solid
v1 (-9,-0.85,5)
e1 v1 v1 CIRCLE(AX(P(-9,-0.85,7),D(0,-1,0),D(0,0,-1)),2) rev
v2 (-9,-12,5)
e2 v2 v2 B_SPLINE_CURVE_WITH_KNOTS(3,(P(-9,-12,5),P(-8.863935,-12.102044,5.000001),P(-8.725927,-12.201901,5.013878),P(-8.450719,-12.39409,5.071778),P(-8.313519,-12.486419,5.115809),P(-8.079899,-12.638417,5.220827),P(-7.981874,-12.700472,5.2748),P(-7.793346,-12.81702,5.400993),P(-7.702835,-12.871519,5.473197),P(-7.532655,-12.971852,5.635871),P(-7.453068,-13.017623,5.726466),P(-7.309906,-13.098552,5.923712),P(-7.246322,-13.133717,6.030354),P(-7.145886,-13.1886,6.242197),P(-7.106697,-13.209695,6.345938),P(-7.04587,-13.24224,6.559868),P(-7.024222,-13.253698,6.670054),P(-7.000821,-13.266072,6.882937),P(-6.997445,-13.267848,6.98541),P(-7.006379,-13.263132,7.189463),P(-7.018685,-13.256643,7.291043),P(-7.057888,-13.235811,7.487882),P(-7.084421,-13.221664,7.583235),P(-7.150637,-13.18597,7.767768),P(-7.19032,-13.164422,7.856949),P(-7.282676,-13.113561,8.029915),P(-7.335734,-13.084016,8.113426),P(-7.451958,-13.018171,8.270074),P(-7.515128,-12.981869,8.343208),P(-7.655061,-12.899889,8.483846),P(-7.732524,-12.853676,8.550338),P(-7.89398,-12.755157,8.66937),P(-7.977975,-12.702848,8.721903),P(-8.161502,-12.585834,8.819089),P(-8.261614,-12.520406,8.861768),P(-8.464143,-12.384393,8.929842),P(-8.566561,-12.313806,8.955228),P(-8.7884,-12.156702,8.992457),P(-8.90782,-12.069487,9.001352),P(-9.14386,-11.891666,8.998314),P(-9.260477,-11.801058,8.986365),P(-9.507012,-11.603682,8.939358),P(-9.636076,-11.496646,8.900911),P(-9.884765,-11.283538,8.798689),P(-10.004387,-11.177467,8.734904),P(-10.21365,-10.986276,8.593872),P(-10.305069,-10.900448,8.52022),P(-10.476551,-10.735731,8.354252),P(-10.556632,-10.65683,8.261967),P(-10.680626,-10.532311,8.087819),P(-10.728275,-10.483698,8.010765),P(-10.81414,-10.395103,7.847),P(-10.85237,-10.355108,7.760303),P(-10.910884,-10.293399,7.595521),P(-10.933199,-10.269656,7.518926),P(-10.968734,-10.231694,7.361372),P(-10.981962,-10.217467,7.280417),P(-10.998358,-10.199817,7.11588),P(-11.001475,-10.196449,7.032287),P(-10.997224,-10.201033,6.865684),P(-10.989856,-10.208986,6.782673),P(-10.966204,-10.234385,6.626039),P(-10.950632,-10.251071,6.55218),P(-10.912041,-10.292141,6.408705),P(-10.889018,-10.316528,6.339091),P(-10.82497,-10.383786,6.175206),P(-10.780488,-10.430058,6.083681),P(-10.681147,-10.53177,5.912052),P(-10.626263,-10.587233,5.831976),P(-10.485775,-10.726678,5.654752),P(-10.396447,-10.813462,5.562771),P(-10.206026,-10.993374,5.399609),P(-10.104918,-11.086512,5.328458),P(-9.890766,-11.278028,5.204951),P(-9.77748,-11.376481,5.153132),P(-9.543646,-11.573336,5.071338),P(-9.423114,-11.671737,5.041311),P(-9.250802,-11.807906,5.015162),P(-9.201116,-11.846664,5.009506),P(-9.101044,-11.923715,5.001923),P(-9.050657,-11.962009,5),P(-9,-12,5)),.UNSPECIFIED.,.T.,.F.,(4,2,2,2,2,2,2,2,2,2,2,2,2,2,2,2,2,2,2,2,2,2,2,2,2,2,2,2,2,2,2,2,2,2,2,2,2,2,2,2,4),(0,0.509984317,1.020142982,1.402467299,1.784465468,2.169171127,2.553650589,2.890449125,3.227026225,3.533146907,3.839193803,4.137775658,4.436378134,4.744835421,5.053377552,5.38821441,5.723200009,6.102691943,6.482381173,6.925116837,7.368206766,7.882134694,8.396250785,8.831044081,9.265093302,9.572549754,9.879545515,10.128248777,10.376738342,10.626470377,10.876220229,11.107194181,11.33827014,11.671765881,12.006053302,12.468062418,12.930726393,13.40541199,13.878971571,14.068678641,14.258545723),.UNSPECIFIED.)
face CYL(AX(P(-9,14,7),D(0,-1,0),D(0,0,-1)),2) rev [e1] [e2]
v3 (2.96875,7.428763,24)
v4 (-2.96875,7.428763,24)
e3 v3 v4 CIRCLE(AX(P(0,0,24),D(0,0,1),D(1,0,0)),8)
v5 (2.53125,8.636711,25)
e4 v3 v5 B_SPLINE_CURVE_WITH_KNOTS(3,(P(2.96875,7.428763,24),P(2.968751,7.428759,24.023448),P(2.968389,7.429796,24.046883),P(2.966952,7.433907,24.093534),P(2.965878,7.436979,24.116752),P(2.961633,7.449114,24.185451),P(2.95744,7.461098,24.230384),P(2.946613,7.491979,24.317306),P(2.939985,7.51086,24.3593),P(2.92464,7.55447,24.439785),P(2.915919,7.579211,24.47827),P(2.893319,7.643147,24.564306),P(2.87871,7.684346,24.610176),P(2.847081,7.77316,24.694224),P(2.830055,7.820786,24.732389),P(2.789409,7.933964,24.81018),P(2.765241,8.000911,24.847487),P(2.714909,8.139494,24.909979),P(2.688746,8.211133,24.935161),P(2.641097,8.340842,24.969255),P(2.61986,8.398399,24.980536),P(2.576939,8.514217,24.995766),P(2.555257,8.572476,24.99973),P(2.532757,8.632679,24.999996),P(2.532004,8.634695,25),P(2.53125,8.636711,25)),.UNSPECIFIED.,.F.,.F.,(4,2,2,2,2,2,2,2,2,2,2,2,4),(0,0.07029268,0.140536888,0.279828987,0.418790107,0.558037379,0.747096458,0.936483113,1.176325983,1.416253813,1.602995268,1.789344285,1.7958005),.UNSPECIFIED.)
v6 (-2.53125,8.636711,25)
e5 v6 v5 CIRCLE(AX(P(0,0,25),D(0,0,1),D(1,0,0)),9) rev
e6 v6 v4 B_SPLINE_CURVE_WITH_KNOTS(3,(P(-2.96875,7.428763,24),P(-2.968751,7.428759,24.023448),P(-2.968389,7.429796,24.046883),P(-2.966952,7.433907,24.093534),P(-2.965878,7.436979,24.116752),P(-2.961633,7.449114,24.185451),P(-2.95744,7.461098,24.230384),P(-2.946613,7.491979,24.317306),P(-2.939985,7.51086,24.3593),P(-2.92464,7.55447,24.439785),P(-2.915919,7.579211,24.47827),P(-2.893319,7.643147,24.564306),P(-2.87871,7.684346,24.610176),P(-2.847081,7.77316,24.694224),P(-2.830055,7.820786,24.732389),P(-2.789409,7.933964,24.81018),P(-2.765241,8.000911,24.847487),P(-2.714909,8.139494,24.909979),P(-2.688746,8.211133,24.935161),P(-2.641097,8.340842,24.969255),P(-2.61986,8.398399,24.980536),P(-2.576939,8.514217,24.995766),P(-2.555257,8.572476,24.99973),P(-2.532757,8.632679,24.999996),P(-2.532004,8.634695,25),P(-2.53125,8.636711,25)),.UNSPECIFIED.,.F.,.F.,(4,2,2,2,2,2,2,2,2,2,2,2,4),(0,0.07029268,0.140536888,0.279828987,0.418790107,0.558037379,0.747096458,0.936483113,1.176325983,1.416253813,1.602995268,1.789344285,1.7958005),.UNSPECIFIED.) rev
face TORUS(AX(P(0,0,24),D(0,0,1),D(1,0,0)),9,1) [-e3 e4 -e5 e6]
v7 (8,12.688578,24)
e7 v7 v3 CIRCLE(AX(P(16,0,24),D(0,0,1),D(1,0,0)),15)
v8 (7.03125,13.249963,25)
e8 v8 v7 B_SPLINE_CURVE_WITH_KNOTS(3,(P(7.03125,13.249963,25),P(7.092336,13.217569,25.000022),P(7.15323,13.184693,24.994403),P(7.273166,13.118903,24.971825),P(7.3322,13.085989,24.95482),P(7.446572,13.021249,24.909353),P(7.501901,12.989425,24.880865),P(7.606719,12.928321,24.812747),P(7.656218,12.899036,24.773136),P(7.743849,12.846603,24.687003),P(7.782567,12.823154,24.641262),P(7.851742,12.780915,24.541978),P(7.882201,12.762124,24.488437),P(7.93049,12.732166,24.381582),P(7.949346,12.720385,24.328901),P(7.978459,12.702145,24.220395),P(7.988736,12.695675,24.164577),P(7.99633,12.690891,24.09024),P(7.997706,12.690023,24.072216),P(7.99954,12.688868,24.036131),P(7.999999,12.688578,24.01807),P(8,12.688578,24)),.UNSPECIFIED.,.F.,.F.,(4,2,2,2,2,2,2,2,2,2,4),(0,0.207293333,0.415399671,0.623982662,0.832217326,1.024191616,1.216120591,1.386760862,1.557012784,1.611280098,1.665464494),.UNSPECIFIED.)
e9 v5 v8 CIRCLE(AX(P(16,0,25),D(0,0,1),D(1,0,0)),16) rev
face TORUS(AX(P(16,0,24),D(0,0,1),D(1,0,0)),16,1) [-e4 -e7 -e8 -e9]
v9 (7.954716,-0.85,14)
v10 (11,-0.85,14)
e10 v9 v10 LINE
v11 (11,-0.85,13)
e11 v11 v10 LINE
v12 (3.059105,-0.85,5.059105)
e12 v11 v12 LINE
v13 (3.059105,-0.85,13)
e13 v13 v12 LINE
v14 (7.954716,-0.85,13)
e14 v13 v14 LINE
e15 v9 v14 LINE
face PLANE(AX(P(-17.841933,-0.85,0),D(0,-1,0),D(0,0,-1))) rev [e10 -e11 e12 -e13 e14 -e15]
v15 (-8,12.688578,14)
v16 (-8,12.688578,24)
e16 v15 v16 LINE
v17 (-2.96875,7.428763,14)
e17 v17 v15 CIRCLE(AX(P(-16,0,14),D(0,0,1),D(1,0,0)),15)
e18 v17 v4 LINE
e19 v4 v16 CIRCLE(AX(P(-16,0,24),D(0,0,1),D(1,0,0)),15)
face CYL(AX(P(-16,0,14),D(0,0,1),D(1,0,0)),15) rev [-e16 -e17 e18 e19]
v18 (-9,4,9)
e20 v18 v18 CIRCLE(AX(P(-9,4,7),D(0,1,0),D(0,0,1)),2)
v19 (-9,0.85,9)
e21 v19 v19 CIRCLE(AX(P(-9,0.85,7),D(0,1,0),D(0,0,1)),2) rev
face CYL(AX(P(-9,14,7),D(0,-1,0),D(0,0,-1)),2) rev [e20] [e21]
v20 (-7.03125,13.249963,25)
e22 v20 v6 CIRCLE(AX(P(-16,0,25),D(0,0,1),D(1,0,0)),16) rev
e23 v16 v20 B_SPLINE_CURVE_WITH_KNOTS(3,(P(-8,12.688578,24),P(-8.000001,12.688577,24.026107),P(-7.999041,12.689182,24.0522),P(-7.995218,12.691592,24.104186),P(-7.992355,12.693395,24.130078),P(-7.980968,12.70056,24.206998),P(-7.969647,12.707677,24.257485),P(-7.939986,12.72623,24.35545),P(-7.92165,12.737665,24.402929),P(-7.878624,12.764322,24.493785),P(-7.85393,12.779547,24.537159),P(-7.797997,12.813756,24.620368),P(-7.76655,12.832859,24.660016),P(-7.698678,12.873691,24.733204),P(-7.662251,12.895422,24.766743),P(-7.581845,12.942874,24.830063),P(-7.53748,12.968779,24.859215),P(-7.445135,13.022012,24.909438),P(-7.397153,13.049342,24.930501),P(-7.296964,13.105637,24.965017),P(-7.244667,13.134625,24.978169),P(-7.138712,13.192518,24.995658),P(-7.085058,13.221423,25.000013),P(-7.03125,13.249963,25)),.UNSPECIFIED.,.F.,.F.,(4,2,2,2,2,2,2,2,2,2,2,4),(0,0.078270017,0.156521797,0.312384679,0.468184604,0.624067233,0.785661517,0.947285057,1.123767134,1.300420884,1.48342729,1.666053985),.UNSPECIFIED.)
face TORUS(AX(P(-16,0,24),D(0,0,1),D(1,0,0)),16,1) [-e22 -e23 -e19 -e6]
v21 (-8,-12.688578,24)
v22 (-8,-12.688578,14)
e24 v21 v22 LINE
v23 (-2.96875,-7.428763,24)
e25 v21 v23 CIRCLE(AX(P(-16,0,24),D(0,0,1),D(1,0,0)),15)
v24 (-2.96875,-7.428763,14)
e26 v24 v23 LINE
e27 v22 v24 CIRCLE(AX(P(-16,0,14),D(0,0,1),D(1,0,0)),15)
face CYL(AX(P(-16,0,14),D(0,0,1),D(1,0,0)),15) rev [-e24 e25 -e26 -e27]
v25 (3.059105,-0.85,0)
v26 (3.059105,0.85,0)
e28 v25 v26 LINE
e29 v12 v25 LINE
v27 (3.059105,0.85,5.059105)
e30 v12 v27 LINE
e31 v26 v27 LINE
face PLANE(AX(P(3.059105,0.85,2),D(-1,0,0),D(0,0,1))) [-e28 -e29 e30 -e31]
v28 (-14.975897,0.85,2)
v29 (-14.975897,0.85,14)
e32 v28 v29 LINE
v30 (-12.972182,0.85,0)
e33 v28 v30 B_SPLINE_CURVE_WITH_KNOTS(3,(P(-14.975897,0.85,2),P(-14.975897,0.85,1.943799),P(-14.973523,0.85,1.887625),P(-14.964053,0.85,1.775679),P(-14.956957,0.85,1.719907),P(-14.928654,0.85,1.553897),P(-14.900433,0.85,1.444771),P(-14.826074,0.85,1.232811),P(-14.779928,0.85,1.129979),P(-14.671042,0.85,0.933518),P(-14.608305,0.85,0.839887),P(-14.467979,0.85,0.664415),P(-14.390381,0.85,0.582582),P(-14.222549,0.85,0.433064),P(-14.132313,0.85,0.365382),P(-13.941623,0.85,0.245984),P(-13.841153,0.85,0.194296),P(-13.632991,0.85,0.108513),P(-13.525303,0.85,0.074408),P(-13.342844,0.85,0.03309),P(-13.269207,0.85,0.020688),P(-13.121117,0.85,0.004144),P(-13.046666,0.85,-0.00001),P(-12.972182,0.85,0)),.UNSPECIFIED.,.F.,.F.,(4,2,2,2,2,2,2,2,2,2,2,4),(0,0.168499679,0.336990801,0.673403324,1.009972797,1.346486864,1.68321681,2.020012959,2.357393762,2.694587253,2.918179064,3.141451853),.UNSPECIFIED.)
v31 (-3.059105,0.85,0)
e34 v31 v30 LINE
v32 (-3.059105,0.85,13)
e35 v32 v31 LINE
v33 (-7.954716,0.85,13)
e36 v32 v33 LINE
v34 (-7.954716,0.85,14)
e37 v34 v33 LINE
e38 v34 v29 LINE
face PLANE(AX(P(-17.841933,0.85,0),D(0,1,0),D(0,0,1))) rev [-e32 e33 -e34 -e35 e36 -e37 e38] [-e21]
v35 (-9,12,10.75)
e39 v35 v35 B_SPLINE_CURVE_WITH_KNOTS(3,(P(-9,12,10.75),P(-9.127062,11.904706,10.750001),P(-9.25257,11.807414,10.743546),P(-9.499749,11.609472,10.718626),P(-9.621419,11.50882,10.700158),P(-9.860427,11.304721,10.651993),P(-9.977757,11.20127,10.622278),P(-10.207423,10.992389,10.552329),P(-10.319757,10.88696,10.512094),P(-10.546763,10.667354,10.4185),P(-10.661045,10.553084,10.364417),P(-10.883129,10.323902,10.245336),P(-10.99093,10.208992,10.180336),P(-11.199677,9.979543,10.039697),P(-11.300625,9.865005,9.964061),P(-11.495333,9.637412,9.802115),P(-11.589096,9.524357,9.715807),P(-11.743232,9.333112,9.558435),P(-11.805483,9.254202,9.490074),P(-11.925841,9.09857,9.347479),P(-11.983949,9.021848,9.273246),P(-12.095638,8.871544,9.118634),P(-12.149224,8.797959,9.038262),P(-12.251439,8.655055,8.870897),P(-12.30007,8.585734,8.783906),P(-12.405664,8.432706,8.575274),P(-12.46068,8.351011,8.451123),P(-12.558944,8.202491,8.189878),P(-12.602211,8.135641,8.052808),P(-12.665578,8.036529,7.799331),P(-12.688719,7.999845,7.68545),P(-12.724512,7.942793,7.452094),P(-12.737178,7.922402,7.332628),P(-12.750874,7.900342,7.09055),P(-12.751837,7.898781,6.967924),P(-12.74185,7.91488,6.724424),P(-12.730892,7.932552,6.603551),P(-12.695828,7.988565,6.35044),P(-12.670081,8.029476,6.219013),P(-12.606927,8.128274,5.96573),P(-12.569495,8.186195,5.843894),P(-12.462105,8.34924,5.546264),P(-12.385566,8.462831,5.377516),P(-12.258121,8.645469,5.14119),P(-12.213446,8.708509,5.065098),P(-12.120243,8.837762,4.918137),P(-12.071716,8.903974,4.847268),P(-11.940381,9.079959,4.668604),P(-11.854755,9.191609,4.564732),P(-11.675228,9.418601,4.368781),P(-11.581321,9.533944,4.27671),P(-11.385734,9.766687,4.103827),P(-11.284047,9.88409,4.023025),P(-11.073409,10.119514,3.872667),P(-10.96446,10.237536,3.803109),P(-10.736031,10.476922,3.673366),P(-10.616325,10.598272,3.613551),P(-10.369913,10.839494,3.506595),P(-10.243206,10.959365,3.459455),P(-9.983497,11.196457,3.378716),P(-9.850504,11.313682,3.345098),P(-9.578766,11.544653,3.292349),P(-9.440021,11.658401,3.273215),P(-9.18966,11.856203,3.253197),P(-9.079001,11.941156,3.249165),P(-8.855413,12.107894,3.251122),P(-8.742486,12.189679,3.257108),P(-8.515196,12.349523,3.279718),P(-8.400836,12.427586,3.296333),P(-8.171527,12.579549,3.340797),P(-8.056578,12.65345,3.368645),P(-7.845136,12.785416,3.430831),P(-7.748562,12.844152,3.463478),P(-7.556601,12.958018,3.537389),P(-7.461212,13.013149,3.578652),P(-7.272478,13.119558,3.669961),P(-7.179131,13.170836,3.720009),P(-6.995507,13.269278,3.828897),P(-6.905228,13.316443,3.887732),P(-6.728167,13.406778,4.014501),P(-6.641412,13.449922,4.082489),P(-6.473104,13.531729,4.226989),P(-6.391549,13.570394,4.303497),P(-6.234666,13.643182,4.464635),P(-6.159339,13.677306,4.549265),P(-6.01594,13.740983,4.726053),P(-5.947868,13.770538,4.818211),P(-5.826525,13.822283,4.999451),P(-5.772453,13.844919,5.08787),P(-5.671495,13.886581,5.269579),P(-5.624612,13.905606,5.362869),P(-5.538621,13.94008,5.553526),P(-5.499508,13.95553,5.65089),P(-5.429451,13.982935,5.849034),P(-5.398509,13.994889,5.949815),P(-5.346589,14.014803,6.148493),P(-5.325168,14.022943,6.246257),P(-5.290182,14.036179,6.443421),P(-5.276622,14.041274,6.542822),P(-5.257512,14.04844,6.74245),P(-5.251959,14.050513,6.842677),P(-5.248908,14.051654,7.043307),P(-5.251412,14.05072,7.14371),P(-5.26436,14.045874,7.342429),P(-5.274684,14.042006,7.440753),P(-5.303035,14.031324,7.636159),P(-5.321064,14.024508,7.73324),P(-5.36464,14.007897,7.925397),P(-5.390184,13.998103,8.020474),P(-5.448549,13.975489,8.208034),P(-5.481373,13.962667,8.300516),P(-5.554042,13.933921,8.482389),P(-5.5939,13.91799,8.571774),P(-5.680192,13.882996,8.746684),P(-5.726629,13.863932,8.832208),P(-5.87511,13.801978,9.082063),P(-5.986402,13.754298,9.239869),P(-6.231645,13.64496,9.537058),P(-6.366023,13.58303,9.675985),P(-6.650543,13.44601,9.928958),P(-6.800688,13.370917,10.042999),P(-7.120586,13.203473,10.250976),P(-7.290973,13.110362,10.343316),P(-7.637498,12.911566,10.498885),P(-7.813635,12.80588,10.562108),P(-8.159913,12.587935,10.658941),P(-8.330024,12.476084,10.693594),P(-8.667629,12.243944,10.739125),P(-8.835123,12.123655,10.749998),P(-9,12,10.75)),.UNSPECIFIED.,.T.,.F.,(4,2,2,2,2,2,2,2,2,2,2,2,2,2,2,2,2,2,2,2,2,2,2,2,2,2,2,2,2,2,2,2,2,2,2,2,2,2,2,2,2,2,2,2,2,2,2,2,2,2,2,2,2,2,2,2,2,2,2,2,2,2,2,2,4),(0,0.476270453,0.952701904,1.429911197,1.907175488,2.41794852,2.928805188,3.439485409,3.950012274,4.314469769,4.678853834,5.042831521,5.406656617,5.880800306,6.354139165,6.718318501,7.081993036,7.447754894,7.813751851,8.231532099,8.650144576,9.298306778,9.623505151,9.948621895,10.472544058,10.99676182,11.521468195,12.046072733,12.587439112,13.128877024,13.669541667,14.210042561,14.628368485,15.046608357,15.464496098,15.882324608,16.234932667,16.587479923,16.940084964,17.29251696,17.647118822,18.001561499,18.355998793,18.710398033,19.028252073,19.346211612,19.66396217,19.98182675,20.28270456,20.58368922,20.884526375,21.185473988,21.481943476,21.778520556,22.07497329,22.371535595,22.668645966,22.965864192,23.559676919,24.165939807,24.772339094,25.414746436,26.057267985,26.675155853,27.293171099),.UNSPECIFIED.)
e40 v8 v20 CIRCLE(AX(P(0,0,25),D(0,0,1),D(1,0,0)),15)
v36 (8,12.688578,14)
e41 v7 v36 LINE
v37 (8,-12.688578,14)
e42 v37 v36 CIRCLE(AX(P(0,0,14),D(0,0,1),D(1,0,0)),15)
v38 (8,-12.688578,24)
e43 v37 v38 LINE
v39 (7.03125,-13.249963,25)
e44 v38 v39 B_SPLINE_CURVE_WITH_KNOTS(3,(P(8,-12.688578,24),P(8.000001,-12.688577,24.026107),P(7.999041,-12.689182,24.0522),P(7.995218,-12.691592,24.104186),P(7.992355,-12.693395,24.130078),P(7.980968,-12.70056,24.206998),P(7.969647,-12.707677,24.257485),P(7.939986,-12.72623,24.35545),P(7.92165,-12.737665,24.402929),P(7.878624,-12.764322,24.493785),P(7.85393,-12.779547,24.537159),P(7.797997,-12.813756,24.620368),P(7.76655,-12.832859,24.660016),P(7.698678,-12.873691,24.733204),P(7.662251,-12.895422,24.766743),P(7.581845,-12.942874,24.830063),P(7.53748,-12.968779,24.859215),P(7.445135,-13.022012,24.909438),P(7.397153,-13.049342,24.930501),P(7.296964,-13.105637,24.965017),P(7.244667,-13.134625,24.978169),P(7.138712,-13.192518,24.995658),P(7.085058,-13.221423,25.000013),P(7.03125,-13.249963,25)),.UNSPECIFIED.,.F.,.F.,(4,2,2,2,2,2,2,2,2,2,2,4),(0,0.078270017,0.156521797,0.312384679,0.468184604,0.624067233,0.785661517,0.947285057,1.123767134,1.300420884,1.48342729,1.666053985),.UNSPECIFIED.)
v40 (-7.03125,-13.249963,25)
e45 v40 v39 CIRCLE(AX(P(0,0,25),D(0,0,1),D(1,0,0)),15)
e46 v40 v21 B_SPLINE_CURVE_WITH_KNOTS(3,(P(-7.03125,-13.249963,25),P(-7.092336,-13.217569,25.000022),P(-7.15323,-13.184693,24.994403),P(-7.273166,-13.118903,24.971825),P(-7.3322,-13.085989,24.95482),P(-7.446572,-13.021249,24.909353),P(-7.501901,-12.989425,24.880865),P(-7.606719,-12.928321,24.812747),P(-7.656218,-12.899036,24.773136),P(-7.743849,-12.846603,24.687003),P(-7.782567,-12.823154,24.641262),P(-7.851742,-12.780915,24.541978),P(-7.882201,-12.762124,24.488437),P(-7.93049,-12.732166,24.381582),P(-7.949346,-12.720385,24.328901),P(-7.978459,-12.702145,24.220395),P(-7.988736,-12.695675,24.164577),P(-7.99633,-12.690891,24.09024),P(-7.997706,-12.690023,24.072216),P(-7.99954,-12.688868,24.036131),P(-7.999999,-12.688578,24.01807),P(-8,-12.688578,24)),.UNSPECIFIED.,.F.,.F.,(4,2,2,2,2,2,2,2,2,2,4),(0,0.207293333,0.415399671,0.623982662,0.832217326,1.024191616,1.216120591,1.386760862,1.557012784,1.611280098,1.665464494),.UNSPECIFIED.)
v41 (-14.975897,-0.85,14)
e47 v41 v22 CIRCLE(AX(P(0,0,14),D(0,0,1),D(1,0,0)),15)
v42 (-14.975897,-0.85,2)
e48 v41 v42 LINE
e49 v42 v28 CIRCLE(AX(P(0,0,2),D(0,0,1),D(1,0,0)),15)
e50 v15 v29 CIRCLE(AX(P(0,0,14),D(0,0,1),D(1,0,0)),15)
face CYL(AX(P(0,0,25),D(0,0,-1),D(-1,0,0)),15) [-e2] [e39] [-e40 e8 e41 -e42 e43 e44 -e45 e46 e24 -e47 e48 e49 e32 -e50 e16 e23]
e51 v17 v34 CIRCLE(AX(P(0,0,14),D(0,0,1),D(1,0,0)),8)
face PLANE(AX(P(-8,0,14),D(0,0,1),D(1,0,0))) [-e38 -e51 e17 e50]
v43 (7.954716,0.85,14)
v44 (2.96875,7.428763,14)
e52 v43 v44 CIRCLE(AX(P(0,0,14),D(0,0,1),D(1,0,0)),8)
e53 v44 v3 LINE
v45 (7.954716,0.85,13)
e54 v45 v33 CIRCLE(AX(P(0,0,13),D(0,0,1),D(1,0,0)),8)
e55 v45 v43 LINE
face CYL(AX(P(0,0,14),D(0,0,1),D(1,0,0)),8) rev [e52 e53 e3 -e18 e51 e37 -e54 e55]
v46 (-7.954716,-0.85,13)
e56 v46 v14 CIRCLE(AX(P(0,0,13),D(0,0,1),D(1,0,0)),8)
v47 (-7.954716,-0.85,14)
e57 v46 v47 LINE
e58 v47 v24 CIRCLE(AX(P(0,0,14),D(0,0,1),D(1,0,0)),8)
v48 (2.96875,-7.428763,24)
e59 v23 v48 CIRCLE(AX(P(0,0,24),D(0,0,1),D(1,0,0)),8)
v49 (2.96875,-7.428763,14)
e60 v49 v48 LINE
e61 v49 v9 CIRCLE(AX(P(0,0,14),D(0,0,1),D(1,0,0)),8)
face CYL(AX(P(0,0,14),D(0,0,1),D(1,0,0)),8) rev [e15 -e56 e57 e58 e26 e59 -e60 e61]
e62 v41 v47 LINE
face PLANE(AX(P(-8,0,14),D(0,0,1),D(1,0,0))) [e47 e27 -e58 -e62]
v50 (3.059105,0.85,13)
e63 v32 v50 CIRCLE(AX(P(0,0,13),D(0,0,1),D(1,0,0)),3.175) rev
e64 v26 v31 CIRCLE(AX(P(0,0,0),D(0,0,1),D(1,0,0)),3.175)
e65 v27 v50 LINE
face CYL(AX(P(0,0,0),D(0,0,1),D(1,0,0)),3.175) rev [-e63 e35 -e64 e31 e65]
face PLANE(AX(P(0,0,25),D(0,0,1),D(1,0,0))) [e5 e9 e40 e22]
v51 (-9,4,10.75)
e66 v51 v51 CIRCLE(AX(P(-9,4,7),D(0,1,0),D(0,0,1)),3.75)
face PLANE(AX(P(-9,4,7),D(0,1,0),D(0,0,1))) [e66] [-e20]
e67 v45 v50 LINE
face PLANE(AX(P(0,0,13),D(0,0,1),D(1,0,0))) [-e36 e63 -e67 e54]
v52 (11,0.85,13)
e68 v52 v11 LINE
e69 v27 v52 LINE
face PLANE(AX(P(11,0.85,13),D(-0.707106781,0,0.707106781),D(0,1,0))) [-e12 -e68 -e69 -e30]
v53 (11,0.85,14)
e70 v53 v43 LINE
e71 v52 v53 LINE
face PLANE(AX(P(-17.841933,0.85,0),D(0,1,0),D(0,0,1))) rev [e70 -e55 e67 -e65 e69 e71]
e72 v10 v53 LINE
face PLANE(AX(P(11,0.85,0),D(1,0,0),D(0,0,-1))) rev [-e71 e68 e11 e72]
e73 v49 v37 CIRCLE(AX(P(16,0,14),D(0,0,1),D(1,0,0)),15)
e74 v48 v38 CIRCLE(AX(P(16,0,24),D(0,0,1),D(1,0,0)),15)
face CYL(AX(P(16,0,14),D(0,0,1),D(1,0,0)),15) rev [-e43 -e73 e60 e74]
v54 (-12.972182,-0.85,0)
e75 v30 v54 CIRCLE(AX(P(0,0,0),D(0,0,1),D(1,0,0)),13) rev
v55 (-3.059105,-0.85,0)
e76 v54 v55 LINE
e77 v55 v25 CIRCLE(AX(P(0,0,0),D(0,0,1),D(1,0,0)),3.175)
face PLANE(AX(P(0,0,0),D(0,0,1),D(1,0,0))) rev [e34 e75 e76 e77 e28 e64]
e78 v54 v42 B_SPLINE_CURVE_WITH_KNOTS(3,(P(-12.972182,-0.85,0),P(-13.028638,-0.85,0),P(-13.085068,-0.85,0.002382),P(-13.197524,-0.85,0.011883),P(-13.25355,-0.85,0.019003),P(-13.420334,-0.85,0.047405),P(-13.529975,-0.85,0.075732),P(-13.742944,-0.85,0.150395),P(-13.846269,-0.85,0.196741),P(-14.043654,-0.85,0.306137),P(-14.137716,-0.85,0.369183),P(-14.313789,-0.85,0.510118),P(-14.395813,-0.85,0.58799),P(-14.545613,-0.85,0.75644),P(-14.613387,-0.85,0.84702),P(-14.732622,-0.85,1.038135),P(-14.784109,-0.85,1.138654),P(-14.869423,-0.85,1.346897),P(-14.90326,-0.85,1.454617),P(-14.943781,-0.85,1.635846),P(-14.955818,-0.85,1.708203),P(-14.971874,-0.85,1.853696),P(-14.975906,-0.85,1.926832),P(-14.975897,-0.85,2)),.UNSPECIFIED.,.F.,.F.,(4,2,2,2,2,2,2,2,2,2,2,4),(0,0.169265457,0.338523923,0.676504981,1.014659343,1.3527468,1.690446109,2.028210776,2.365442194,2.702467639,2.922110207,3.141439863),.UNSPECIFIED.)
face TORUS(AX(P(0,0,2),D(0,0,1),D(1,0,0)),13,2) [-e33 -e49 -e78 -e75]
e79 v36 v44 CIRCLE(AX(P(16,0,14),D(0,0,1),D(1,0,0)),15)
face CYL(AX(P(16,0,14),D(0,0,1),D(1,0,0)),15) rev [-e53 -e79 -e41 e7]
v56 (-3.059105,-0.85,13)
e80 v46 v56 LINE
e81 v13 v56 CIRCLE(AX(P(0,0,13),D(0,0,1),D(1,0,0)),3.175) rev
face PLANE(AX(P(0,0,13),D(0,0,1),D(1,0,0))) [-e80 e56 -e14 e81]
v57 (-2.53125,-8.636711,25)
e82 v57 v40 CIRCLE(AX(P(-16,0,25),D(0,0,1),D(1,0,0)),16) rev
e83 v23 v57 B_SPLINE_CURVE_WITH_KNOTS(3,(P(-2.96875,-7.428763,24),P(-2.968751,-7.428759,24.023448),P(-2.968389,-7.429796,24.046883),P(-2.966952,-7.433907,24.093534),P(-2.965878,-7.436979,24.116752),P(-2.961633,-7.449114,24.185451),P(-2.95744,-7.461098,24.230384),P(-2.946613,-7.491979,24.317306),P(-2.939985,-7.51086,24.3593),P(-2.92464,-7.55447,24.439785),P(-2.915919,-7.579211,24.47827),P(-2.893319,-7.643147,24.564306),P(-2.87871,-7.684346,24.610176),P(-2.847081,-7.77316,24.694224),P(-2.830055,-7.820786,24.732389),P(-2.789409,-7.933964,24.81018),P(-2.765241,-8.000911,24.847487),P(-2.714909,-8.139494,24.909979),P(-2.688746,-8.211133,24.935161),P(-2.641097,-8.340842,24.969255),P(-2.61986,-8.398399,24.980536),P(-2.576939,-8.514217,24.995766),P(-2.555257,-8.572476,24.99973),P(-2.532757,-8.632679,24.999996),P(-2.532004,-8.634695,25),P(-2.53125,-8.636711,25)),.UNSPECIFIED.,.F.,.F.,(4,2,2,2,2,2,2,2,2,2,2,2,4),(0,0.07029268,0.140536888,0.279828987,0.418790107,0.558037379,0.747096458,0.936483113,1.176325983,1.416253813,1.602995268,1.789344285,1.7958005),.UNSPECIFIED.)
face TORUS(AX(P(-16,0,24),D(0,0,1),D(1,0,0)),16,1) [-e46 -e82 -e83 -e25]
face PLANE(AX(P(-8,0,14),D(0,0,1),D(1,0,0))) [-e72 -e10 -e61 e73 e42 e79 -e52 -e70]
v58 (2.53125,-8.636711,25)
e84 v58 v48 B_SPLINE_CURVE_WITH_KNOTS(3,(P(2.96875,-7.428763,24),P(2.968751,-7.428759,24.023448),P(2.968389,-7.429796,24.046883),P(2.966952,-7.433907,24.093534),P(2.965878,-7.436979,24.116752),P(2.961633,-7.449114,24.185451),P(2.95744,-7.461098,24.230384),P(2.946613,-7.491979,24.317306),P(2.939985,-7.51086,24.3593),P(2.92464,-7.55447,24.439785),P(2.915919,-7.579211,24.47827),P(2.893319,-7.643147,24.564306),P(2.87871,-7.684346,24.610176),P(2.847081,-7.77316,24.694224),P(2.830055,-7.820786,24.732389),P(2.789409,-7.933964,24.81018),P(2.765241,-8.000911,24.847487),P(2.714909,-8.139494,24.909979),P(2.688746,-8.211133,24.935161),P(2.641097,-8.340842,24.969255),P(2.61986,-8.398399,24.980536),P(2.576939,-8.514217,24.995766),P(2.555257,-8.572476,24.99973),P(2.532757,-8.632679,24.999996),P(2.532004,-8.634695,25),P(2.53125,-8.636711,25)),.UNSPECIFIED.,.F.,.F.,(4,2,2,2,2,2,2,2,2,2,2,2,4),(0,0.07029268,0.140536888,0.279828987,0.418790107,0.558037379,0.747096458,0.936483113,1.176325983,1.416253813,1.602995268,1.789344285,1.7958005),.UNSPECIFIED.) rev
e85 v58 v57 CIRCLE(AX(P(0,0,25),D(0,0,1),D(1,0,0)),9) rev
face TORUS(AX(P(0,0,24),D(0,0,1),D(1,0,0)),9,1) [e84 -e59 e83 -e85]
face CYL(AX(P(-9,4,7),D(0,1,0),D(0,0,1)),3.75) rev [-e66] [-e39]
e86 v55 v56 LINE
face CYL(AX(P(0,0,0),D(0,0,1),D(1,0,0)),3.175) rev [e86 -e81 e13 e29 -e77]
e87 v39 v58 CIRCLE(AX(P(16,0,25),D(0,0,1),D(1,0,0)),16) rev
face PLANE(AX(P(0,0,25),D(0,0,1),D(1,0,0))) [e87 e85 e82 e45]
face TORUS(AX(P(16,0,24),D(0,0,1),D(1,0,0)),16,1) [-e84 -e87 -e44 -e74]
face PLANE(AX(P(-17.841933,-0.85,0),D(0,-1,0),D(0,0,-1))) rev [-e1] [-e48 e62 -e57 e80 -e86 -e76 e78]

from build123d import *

# Parameters (mm, degrees)
SKETCH1_R               = 15
BOSS_EXTRUDE1_DEPTH     = 25
CUT_EXTRUDE1_DEPTH      = 11
SKETCH4_R               = 3.175
CUT_EXTRUDE2_DEPTH      = 14
SKETCH5_R               = 8
CUT_EXTRUDE3_DEPTH      = 1
SKETCH6_W               = 28.841933153
SKETCH6_H               = 1.7
CUT_EXTRUDE4_DEPTH      = 14
SKETCH7_W               = 7.940894739
SKETCH7_H               = 1.7
BOSS_EXTRUDE2_DEPTH     = 2
CHAMFER1_SIZE           = 11
CUT_EXTRUDE5_DEPTH      = 14
CUT_EXTRUDE5_DEPTH_BACK = 14
SKETCH8_R               = 2
SKETCH9_R               = 3.75
CUT_EXTRUDE6_DEPTH      = 11
FILLET1_R               = 2
FILLET2_R               = 1


with BuildPart() as part:
    # Sketch1 → Boss-Extrude1 (new body)
    with BuildSketch(Plane.XY):
        Circle(SKETCH1_R)
    extrude(amount=BOSS_EXTRUDE1_DEPTH)

    # Sketch3 → Cut-Extrude1 (cut)
    with BuildSketch(Plane.XY.offset(25)):
        with BuildLine():
            ThreePointArc((2.96875, -7.428763251), (31, 0), (2.96875, 7.428763251))
            ThreePointArc((2.96875, 7.428763251), (0, 8), (-2.96875, 7.428763251))
            ThreePointArc((-2.96875, 7.428763251), (-31, 0), (-2.96875, -7.428763251))
            ThreePointArc((-2.96875, -7.428763251), (0, -8), (2.96875, -7.428763251))
        make_face()
    extrude(amount=-CUT_EXTRUDE1_DEPTH, mode=Mode.SUBTRACT)

    # Sketch4 → Cut-Extrude2 (cut)
    with BuildSketch(Plane.XY.offset(14)):
        Circle(SKETCH4_R)
    extrude(amount=-CUT_EXTRUDE2_DEPTH, mode=Mode.SUBTRACT)

    # Sketch5 → Cut-Extrude3 (cut)
    with BuildSketch(Plane.XY.offset(14)):
        Circle(SKETCH5_R)
    extrude(amount=-CUT_EXTRUDE3_DEPTH, mode=Mode.SUBTRACT)

    # Sketch6 → Cut-Extrude4 (cut)
    with BuildSketch(Plane.XY.offset(14)):
        with Locations((-3.420966576, 0)):
            Rectangle(SKETCH6_W, SKETCH6_H)
    extrude(amount=-CUT_EXTRUDE4_DEPTH, mode=Mode.SUBTRACT)

    # Sketch7 → Boss-Extrude2 (add)
    with BuildSketch(Plane(origin=(0, 0, 0), x_dir=(-1, 0, 0), z_dir=(0, 0, -1))):
        with Locations((-7.02955263, 0)):
            Rectangle(SKETCH7_W, SKETCH7_H)
    extrude(amount=-BOSS_EXTRUDE2_DEPTH)

    # Chamfer1
    # the kernel refuses this chamfer: 11 mm, written as the material it adds along each edge
    with BuildSketch(Plane(origin=(11, -0.85, 2), x_dir=(0.027495876610586414, 0, 0.9996219169112968), z_dir=(0, 1, 0))) as chamfer1_piece_1_section:
        Polygon((CHAMFER1_SIZE * 0.999621916911, -CHAMFER1_SIZE * 0.0274958766106), (-CHAMFER1_SIZE * 0.0274958766106, -CHAMFER1_SIZE * 0.999621916911), (0, 0), align=None)
    chamfer1_piece_1 = extrude(amount=1.7, mode=Mode.PRIVATE)
    chamfer1_piece_1 = split(chamfer1_piece_1, bisect_by=Plane(origin=(3.059105261, 0, 5.913893193), z_dir=(1, 0, 0)), keep=Keep.TOP, mode=Mode.PRIVATE)
    add(chamfer1_piece_1)

    # Sketch8 → Cut-Extrude5 (cut, two sides: drawn at the far end of the back side and taken through both)
    with BuildSketch(Plane(origin=(0, 0, 0), x_dir=(1, 0, 0), z_dir=(0, 1, 0)).offset(-CUT_EXTRUDE5_DEPTH_BACK)):
        with Locations(Location((-9, -7, 0), (0, 0, 90))):
            Circle(SKETCH8_R)
    extrude(amount=CUT_EXTRUDE5_DEPTH + CUT_EXTRUDE5_DEPTH_BACK, mode=Mode.SUBTRACT)

    # Sketch9 → Cut-Extrude6 (cut)
    with BuildSketch(Plane(origin=(0, 15, 0), x_dir=(1, 0, 0), z_dir=(0, 1, 0))):
        with Locations(Location((-9, -7, 0), (0, 0, 270))):
            Circle(SKETCH9_R)
    extrude(amount=-CUT_EXTRUDE6_DEPTH, mode=Mode.SUBTRACT)

    # Fillet1
    fillet1_edges = [part.edges().sort_by_distance(p)[0] for p in [
        (15, 0, 0),
    ]]
    fillet(fillet1_edges, radius=FILLET1_R)

    # Fillet2
    fillet2_edges = [part.edges().sort_by_distance(p)[0] for p in [
        (-5.160499055, 10.368472369, 25),
        (0, -8, 25),
        (5.160499055, -10.368472369, 25),
        (0, 8, 25),
        (-5.160499055, -10.368472369, 25),
        (5.160499055, 10.368472369, 25),
    ]]
    fillet(fillet2_edges, radius=FILLET2_R)


solid = part.part
